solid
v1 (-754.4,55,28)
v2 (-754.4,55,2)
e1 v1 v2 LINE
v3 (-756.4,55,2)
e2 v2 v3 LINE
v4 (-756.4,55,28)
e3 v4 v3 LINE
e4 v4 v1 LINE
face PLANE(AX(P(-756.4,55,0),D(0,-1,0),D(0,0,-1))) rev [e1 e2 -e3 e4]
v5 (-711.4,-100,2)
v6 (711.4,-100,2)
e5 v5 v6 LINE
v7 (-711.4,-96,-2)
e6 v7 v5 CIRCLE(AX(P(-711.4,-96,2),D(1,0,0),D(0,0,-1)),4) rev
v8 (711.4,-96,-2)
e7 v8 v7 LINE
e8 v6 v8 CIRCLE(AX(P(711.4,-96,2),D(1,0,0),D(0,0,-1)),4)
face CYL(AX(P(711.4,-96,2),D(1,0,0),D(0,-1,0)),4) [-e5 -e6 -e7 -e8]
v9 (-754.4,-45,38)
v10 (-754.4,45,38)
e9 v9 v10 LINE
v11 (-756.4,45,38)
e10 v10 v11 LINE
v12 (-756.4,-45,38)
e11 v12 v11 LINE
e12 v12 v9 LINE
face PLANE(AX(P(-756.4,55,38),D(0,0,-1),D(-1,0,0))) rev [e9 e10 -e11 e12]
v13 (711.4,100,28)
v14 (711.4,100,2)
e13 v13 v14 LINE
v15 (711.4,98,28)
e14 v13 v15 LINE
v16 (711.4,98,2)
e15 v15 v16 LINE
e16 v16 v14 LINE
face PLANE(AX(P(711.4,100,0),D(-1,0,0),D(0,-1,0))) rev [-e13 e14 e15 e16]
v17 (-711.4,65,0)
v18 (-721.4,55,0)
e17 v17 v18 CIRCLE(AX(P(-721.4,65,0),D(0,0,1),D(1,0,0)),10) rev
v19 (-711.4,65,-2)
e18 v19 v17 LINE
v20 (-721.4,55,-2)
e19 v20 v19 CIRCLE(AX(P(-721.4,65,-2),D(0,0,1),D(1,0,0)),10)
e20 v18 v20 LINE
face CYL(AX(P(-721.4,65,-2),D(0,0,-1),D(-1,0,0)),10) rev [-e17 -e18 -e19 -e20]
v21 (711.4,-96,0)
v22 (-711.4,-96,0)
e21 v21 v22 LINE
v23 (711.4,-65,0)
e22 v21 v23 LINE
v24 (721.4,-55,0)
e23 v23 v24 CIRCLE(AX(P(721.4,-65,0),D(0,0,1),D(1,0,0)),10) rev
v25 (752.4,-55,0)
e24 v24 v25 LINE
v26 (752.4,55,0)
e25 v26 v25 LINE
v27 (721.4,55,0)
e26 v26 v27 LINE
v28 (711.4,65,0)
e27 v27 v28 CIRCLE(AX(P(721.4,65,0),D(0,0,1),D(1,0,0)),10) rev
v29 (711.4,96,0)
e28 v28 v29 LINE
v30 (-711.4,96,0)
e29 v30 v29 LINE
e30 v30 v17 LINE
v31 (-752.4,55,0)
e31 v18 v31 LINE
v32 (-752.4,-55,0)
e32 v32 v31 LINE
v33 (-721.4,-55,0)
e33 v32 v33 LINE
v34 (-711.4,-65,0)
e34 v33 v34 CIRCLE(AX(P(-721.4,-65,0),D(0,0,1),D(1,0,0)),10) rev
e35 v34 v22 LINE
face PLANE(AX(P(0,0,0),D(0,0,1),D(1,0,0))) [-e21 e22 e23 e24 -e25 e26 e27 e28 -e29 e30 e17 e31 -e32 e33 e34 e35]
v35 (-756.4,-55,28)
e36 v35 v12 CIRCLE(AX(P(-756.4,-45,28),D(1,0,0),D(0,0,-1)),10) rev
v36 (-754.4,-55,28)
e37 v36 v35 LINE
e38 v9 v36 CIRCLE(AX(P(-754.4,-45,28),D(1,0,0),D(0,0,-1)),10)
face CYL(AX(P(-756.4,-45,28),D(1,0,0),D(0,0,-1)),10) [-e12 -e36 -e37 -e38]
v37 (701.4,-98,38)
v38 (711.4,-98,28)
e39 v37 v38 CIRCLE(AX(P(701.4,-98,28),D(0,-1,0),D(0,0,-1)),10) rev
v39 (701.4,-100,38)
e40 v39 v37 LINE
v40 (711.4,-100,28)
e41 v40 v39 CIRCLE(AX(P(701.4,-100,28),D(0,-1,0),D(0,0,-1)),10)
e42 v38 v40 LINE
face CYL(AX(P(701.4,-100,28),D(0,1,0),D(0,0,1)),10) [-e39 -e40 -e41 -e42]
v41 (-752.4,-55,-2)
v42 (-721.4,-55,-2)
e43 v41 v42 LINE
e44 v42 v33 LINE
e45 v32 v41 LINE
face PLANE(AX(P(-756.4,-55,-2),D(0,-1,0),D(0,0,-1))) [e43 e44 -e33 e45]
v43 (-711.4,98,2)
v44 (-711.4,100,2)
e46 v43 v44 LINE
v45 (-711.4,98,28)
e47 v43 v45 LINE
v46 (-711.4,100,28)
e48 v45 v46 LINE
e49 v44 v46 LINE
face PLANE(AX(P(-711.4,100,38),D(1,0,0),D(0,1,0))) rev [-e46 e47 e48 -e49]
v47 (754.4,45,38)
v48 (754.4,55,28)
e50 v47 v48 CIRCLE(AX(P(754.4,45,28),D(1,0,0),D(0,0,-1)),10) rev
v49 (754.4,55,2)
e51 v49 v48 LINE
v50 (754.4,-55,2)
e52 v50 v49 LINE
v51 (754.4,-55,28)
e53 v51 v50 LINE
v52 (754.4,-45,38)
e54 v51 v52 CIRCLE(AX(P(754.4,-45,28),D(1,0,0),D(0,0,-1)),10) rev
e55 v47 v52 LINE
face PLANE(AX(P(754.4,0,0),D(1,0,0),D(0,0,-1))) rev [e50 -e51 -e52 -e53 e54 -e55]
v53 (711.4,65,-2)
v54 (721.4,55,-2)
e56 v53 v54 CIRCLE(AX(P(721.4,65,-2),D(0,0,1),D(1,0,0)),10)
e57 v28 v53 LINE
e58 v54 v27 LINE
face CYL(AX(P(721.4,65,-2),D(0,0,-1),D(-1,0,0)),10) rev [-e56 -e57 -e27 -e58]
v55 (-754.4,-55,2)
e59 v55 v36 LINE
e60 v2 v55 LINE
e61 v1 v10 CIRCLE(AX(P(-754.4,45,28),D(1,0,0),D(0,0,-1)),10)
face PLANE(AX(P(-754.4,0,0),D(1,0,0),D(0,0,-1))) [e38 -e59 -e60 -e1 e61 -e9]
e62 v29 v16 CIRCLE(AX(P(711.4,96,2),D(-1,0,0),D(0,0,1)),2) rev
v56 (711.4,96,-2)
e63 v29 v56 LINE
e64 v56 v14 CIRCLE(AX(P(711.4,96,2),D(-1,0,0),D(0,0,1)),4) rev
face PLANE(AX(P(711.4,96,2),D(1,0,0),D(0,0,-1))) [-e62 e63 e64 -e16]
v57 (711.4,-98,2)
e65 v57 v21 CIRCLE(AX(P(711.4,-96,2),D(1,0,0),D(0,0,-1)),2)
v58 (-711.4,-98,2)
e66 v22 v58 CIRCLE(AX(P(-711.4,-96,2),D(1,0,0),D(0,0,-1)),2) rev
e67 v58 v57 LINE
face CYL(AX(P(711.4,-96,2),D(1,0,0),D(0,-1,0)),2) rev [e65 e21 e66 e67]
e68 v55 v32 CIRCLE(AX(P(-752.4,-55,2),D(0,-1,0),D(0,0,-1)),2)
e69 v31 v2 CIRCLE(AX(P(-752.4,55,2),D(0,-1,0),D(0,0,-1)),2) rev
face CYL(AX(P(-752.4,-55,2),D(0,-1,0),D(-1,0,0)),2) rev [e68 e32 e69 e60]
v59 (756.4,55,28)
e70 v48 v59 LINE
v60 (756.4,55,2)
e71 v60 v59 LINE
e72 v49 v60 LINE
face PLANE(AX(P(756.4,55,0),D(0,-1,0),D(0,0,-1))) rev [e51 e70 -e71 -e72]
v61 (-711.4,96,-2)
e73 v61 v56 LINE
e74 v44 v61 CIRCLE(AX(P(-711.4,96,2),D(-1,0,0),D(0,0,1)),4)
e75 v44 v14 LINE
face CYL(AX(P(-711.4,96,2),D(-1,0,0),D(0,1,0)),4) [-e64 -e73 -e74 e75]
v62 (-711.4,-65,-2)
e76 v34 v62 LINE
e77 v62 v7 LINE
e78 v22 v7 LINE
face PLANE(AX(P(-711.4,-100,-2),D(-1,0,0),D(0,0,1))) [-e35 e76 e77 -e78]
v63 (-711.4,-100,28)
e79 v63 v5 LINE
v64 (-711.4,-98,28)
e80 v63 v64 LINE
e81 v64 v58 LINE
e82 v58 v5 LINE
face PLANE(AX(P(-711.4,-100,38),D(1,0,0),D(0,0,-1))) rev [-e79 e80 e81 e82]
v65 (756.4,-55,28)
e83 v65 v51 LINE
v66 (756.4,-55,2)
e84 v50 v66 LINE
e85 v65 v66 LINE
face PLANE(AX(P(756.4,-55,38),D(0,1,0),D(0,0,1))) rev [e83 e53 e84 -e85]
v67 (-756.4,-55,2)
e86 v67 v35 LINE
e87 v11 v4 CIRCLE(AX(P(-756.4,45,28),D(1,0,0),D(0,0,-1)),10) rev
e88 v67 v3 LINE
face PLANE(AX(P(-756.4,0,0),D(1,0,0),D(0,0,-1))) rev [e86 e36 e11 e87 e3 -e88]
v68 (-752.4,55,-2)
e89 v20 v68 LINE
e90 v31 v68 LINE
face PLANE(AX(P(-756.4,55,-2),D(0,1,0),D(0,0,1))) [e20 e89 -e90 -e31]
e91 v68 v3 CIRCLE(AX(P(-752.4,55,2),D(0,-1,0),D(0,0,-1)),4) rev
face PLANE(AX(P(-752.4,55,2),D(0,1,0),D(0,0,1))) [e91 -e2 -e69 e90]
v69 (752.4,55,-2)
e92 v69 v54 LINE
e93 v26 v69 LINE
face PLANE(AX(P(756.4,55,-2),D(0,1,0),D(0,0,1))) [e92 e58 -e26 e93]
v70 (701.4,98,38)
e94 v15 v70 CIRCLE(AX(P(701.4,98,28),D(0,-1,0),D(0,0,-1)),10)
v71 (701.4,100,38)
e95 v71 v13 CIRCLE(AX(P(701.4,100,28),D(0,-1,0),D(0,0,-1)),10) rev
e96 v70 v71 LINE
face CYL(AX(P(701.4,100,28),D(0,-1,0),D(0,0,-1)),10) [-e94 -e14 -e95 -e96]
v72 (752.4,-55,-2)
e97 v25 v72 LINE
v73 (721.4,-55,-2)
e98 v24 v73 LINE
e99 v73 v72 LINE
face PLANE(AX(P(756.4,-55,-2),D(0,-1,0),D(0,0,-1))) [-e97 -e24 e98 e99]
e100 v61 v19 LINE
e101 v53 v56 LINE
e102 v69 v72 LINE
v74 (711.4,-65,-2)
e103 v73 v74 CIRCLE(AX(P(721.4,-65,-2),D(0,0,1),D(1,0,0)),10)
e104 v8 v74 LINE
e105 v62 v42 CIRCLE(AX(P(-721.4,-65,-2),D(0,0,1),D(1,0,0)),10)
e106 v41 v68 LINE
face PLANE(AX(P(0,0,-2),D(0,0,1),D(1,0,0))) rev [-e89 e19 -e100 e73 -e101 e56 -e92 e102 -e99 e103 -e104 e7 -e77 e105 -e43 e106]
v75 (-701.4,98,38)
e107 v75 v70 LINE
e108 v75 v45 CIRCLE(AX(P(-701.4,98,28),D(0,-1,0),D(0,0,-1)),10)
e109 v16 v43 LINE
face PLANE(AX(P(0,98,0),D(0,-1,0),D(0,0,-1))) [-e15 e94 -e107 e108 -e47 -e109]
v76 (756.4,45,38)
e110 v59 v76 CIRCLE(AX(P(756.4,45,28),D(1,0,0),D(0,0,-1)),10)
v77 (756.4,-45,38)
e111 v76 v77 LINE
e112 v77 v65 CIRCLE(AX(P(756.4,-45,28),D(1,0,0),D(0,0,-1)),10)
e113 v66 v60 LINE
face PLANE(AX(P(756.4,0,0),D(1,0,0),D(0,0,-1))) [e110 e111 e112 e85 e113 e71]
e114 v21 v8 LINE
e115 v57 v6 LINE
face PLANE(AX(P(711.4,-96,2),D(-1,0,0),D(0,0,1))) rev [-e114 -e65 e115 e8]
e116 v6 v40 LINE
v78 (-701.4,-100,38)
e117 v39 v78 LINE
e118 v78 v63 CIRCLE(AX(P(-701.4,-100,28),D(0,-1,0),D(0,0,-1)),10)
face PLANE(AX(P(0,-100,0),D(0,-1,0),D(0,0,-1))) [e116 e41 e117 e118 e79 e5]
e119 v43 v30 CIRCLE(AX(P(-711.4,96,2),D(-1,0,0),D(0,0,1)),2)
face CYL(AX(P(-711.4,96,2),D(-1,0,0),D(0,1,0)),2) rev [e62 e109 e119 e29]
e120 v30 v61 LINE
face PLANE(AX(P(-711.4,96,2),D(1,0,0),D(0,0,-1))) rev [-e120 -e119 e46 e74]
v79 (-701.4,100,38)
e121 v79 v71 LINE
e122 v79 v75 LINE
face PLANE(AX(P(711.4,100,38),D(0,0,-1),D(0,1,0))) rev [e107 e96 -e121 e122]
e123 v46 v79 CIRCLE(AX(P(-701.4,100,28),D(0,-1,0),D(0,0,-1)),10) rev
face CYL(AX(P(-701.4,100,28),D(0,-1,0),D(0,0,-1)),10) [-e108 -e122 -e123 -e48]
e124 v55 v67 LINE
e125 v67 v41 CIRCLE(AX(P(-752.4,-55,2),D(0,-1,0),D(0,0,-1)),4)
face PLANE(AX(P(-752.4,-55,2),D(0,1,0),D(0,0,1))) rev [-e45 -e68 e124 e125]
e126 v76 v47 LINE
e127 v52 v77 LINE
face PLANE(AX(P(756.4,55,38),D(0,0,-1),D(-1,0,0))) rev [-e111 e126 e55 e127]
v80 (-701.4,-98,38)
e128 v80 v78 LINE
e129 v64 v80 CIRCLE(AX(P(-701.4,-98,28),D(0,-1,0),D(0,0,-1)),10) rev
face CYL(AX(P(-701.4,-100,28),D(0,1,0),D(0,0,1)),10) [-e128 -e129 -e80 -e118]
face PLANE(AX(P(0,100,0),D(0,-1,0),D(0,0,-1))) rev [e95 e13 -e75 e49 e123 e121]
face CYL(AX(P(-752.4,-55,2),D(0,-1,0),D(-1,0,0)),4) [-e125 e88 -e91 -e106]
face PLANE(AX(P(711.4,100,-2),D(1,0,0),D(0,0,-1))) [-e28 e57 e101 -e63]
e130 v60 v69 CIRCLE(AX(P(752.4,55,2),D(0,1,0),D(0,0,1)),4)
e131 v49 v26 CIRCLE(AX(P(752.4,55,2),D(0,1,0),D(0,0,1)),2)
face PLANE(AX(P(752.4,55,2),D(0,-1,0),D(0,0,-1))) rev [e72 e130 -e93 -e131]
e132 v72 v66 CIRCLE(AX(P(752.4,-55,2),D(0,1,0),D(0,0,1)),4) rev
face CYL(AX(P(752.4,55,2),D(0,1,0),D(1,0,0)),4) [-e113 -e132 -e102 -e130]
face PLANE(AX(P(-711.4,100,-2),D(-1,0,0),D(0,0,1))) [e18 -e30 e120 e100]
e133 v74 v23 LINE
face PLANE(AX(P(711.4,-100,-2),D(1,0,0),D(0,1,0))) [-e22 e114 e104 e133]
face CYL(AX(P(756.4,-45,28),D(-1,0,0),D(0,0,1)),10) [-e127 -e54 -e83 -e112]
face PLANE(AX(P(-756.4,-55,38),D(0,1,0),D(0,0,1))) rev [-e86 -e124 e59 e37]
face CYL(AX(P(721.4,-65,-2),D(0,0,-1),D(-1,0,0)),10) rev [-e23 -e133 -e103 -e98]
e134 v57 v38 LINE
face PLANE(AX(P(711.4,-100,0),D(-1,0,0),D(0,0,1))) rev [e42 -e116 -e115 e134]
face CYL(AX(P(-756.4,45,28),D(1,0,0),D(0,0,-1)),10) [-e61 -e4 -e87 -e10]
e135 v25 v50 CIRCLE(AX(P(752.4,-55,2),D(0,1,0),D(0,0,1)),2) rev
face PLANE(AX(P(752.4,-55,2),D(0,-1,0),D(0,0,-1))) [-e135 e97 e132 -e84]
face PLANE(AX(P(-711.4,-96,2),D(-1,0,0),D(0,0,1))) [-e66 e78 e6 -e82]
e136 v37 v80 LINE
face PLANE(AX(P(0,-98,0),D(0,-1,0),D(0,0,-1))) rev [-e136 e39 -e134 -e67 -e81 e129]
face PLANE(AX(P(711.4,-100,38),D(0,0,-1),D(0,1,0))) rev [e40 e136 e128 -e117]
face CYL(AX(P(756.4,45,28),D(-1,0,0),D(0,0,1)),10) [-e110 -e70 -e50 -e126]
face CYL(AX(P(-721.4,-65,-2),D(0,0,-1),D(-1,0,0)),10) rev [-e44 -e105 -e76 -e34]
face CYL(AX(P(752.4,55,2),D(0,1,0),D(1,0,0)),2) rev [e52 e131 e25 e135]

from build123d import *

# Parameters (mm, degrees)
BASE_FLANGE1_DEPTH             = 2
EDGE_FLANGE1_STRIP_W           = 12
EDGE_FLANGE1_STRIP_H           = 2
EDGE_FLANGE1_STRIP_CUT_DEPTH   = 1422.8
EDGE_FLANGE1_STRIP_2_W         = 12
EDGE_FLANGE1_STRIP_2_H         = 2
EDGE_FLANGE1_STRIP_CUT_2_DEPTH = 110
EDGE_FLANGE1_STRIP_3_W         = 12
EDGE_FLANGE1_STRIP_3_H         = 2
EDGE_FLANGE1_STRIP_CUT_3_DEPTH = 1422.8
EDGE_FLANGE1_STRIP_4_W         = 12
EDGE_FLANGE1_STRIP_4_H         = 2
EDGE_FLANGE1_STRIP_CUT_4_DEPTH = 110
EDGE_FLANGE1_DEPTH             = 1422.8
EDGE_FLANGE1_BEND_DEPTH        = 110
EDGE_FLANGE1_BEND_2_DEPTH      = 1422.8
EDGE_FLANGE1_BEND_3_DEPTH      = 110
FILLET1_R                      = 10


# Sheet-metal steps are written as plain solids
with BuildPart() as part:
    # Sketch1 → Base-Flange1 (new body)
    with BuildSketch(Plane.XY):
        Polygon((-711.4, -100), (711.4, -100), (711.4, -55), (756.4, -55), (756.4, 55), (711.4, 55), (711.4, 100), (-711.4, 100), (-711.4, 55), (-756.4, 55), (-756.4, -55), (-711.4, -55), align=None)
    extrude(amount=-BASE_FLANGE1_DEPTH)

    # Edge-Flange1 strip (across the edge) → Edge-Flange1 strip cut (cut)
    with BuildSketch(Plane(origin=(711.4, 100, 0), x_dir=(0, -1, 0), z_dir=(-1, 0, 0))):
        with Locations((-2, -1)):
            Rectangle(EDGE_FLANGE1_STRIP_W, EDGE_FLANGE1_STRIP_H)
    extrude(amount=EDGE_FLANGE1_STRIP_CUT_DEPTH, mode=Mode.SUBTRACT)

    # Edge-Flange1 strip 2 (across the edge) → Edge-Flange1 strip cut 2 (cut)
    with BuildSketch(Plane(origin=(756.4, -55, 0), x_dir=(-1, 0, 0), z_dir=(0, 1, 0))):
        with Locations((-2, -1)):
            Rectangle(EDGE_FLANGE1_STRIP_2_W, EDGE_FLANGE1_STRIP_2_H)
    extrude(amount=EDGE_FLANGE1_STRIP_CUT_2_DEPTH, mode=Mode.SUBTRACT)

    # Edge-Flange1 strip 3 (across the edge) → Edge-Flange1 strip cut 3 (cut)
    with BuildSketch(Plane(origin=(-711.4, -100, 0), x_dir=(0, 1, 0), z_dir=(1, 0, 0))):
        with Locations((-2, -1)):
            Rectangle(EDGE_FLANGE1_STRIP_3_W, EDGE_FLANGE1_STRIP_3_H)
    extrude(amount=EDGE_FLANGE1_STRIP_CUT_3_DEPTH, mode=Mode.SUBTRACT)

    # Edge-Flange1 strip 4 (across the edge) → Edge-Flange1 strip cut 4 (cut)
    with BuildSketch(Plane(origin=(-756.4, 55, 0), x_dir=(1, 0, 0), z_dir=(0, -1, 0))):
        with Locations((-2, -1)):
            Rectangle(EDGE_FLANGE1_STRIP_4_W, EDGE_FLANGE1_STRIP_4_H)
    extrude(amount=EDGE_FLANGE1_STRIP_CUT_4_DEPTH, mode=Mode.SUBTRACT)

    # Edge-Flange1 section (across the edge) → Edge-Flange1 (add)
    with BuildSketch(Plane(origin=(711.4, 100, 0), x_dir=(0, -1, 0), z_dir=(-1, 0, 0))):
        with BuildLine():
            Line((0, 2), (0, 38))
            Line((0, 38), (2, 38))
            Line((2, 38), (2, 2))
            ThreePointArc((2, 2), (2.585786438, 0.585786438), (4, 0))
            Line((4, 0), (4, -2))
            ThreePointArc((4, -2), (1.171572875, -0.828427125), (0, 2))
        make_face()
    extrude(amount=EDGE_FLANGE1_DEPTH)

    # Edge-Flange1 section 2 (across the edge) → Edge-Flange1 bend (add)
    with BuildSketch(Plane(origin=(756.4, -55, 0), x_dir=(-1, 0, 0), z_dir=(0, 1, 0))):
        with BuildLine():
            Line((0, 2), (0, 38))
            Line((0, 38), (2, 38))
            Line((2, 38), (2, 2))
            ThreePointArc((2, 2), (2.585786438, 0.585786438), (4, 0))
            Line((4, 0), (4, -2))
            ThreePointArc((4, -2), (1.171572875, -0.828427125), (0, 2))
        make_face()
    extrude(amount=EDGE_FLANGE1_BEND_DEPTH)

    # Edge-Flange1 section 3 (across the edge) → Edge-Flange1 bend 2 (add)
    with BuildSketch(Plane(origin=(-711.4, -100, 0), x_dir=(0, 1, 0), z_dir=(1, 0, 0))):
        with BuildLine():
            Line((0, 2), (0, 38))
            Line((0, 38), (2, 38))
            Line((2, 38), (2, 2))
            ThreePointArc((2, 2), (2.585786438, 0.585786438), (4, 0))
            Line((4, 0), (4, -2))
            ThreePointArc((4, -2), (1.171572875, -0.828427125), (0, 2))
        make_face()
    extrude(amount=EDGE_FLANGE1_BEND_2_DEPTH)

    # Edge-Flange1 section 4 (across the edge) → Edge-Flange1 bend 3 (add)
    with BuildSketch(Plane(origin=(-756.4, 55, 0), x_dir=(1, 0, 0), z_dir=(0, -1, 0))):
        with BuildLine():
            Line((0, 2), (0, 38))
            Line((0, 38), (2, 38))
            Line((2, 38), (2, 2))
            ThreePointArc((2, 2), (2.585786438, 0.585786438), (4, 0))
            Line((4, 0), (4, -2))
            ThreePointArc((4, -2), (1.171572875, -0.828427125), (0, 2))
        make_face()
    extrude(amount=EDGE_FLANGE1_BEND_3_DEPTH)

    # Fillet1
    fillet1_edges = [part.edges().sort_by_distance(p)[0] for p in [
        (755.4, -55, 38),
        (755.4, 55, 38),
        (-711.4, -99, 38),
        (711.4, -99, 38),
        (-755.4, 55, 38),
        (-755.4, -55, 38),
        (711.4, 55, -1),
        (711.4, -55, -1),
        (-711.4, -55, -1),
        (-711.4, 55, -1),
        (711.4, 99, 38),
        (-711.4, 99, 38),
    ]]
    fillet(fillet1_edges, radius=FILLET1_R)


solid = part.part
